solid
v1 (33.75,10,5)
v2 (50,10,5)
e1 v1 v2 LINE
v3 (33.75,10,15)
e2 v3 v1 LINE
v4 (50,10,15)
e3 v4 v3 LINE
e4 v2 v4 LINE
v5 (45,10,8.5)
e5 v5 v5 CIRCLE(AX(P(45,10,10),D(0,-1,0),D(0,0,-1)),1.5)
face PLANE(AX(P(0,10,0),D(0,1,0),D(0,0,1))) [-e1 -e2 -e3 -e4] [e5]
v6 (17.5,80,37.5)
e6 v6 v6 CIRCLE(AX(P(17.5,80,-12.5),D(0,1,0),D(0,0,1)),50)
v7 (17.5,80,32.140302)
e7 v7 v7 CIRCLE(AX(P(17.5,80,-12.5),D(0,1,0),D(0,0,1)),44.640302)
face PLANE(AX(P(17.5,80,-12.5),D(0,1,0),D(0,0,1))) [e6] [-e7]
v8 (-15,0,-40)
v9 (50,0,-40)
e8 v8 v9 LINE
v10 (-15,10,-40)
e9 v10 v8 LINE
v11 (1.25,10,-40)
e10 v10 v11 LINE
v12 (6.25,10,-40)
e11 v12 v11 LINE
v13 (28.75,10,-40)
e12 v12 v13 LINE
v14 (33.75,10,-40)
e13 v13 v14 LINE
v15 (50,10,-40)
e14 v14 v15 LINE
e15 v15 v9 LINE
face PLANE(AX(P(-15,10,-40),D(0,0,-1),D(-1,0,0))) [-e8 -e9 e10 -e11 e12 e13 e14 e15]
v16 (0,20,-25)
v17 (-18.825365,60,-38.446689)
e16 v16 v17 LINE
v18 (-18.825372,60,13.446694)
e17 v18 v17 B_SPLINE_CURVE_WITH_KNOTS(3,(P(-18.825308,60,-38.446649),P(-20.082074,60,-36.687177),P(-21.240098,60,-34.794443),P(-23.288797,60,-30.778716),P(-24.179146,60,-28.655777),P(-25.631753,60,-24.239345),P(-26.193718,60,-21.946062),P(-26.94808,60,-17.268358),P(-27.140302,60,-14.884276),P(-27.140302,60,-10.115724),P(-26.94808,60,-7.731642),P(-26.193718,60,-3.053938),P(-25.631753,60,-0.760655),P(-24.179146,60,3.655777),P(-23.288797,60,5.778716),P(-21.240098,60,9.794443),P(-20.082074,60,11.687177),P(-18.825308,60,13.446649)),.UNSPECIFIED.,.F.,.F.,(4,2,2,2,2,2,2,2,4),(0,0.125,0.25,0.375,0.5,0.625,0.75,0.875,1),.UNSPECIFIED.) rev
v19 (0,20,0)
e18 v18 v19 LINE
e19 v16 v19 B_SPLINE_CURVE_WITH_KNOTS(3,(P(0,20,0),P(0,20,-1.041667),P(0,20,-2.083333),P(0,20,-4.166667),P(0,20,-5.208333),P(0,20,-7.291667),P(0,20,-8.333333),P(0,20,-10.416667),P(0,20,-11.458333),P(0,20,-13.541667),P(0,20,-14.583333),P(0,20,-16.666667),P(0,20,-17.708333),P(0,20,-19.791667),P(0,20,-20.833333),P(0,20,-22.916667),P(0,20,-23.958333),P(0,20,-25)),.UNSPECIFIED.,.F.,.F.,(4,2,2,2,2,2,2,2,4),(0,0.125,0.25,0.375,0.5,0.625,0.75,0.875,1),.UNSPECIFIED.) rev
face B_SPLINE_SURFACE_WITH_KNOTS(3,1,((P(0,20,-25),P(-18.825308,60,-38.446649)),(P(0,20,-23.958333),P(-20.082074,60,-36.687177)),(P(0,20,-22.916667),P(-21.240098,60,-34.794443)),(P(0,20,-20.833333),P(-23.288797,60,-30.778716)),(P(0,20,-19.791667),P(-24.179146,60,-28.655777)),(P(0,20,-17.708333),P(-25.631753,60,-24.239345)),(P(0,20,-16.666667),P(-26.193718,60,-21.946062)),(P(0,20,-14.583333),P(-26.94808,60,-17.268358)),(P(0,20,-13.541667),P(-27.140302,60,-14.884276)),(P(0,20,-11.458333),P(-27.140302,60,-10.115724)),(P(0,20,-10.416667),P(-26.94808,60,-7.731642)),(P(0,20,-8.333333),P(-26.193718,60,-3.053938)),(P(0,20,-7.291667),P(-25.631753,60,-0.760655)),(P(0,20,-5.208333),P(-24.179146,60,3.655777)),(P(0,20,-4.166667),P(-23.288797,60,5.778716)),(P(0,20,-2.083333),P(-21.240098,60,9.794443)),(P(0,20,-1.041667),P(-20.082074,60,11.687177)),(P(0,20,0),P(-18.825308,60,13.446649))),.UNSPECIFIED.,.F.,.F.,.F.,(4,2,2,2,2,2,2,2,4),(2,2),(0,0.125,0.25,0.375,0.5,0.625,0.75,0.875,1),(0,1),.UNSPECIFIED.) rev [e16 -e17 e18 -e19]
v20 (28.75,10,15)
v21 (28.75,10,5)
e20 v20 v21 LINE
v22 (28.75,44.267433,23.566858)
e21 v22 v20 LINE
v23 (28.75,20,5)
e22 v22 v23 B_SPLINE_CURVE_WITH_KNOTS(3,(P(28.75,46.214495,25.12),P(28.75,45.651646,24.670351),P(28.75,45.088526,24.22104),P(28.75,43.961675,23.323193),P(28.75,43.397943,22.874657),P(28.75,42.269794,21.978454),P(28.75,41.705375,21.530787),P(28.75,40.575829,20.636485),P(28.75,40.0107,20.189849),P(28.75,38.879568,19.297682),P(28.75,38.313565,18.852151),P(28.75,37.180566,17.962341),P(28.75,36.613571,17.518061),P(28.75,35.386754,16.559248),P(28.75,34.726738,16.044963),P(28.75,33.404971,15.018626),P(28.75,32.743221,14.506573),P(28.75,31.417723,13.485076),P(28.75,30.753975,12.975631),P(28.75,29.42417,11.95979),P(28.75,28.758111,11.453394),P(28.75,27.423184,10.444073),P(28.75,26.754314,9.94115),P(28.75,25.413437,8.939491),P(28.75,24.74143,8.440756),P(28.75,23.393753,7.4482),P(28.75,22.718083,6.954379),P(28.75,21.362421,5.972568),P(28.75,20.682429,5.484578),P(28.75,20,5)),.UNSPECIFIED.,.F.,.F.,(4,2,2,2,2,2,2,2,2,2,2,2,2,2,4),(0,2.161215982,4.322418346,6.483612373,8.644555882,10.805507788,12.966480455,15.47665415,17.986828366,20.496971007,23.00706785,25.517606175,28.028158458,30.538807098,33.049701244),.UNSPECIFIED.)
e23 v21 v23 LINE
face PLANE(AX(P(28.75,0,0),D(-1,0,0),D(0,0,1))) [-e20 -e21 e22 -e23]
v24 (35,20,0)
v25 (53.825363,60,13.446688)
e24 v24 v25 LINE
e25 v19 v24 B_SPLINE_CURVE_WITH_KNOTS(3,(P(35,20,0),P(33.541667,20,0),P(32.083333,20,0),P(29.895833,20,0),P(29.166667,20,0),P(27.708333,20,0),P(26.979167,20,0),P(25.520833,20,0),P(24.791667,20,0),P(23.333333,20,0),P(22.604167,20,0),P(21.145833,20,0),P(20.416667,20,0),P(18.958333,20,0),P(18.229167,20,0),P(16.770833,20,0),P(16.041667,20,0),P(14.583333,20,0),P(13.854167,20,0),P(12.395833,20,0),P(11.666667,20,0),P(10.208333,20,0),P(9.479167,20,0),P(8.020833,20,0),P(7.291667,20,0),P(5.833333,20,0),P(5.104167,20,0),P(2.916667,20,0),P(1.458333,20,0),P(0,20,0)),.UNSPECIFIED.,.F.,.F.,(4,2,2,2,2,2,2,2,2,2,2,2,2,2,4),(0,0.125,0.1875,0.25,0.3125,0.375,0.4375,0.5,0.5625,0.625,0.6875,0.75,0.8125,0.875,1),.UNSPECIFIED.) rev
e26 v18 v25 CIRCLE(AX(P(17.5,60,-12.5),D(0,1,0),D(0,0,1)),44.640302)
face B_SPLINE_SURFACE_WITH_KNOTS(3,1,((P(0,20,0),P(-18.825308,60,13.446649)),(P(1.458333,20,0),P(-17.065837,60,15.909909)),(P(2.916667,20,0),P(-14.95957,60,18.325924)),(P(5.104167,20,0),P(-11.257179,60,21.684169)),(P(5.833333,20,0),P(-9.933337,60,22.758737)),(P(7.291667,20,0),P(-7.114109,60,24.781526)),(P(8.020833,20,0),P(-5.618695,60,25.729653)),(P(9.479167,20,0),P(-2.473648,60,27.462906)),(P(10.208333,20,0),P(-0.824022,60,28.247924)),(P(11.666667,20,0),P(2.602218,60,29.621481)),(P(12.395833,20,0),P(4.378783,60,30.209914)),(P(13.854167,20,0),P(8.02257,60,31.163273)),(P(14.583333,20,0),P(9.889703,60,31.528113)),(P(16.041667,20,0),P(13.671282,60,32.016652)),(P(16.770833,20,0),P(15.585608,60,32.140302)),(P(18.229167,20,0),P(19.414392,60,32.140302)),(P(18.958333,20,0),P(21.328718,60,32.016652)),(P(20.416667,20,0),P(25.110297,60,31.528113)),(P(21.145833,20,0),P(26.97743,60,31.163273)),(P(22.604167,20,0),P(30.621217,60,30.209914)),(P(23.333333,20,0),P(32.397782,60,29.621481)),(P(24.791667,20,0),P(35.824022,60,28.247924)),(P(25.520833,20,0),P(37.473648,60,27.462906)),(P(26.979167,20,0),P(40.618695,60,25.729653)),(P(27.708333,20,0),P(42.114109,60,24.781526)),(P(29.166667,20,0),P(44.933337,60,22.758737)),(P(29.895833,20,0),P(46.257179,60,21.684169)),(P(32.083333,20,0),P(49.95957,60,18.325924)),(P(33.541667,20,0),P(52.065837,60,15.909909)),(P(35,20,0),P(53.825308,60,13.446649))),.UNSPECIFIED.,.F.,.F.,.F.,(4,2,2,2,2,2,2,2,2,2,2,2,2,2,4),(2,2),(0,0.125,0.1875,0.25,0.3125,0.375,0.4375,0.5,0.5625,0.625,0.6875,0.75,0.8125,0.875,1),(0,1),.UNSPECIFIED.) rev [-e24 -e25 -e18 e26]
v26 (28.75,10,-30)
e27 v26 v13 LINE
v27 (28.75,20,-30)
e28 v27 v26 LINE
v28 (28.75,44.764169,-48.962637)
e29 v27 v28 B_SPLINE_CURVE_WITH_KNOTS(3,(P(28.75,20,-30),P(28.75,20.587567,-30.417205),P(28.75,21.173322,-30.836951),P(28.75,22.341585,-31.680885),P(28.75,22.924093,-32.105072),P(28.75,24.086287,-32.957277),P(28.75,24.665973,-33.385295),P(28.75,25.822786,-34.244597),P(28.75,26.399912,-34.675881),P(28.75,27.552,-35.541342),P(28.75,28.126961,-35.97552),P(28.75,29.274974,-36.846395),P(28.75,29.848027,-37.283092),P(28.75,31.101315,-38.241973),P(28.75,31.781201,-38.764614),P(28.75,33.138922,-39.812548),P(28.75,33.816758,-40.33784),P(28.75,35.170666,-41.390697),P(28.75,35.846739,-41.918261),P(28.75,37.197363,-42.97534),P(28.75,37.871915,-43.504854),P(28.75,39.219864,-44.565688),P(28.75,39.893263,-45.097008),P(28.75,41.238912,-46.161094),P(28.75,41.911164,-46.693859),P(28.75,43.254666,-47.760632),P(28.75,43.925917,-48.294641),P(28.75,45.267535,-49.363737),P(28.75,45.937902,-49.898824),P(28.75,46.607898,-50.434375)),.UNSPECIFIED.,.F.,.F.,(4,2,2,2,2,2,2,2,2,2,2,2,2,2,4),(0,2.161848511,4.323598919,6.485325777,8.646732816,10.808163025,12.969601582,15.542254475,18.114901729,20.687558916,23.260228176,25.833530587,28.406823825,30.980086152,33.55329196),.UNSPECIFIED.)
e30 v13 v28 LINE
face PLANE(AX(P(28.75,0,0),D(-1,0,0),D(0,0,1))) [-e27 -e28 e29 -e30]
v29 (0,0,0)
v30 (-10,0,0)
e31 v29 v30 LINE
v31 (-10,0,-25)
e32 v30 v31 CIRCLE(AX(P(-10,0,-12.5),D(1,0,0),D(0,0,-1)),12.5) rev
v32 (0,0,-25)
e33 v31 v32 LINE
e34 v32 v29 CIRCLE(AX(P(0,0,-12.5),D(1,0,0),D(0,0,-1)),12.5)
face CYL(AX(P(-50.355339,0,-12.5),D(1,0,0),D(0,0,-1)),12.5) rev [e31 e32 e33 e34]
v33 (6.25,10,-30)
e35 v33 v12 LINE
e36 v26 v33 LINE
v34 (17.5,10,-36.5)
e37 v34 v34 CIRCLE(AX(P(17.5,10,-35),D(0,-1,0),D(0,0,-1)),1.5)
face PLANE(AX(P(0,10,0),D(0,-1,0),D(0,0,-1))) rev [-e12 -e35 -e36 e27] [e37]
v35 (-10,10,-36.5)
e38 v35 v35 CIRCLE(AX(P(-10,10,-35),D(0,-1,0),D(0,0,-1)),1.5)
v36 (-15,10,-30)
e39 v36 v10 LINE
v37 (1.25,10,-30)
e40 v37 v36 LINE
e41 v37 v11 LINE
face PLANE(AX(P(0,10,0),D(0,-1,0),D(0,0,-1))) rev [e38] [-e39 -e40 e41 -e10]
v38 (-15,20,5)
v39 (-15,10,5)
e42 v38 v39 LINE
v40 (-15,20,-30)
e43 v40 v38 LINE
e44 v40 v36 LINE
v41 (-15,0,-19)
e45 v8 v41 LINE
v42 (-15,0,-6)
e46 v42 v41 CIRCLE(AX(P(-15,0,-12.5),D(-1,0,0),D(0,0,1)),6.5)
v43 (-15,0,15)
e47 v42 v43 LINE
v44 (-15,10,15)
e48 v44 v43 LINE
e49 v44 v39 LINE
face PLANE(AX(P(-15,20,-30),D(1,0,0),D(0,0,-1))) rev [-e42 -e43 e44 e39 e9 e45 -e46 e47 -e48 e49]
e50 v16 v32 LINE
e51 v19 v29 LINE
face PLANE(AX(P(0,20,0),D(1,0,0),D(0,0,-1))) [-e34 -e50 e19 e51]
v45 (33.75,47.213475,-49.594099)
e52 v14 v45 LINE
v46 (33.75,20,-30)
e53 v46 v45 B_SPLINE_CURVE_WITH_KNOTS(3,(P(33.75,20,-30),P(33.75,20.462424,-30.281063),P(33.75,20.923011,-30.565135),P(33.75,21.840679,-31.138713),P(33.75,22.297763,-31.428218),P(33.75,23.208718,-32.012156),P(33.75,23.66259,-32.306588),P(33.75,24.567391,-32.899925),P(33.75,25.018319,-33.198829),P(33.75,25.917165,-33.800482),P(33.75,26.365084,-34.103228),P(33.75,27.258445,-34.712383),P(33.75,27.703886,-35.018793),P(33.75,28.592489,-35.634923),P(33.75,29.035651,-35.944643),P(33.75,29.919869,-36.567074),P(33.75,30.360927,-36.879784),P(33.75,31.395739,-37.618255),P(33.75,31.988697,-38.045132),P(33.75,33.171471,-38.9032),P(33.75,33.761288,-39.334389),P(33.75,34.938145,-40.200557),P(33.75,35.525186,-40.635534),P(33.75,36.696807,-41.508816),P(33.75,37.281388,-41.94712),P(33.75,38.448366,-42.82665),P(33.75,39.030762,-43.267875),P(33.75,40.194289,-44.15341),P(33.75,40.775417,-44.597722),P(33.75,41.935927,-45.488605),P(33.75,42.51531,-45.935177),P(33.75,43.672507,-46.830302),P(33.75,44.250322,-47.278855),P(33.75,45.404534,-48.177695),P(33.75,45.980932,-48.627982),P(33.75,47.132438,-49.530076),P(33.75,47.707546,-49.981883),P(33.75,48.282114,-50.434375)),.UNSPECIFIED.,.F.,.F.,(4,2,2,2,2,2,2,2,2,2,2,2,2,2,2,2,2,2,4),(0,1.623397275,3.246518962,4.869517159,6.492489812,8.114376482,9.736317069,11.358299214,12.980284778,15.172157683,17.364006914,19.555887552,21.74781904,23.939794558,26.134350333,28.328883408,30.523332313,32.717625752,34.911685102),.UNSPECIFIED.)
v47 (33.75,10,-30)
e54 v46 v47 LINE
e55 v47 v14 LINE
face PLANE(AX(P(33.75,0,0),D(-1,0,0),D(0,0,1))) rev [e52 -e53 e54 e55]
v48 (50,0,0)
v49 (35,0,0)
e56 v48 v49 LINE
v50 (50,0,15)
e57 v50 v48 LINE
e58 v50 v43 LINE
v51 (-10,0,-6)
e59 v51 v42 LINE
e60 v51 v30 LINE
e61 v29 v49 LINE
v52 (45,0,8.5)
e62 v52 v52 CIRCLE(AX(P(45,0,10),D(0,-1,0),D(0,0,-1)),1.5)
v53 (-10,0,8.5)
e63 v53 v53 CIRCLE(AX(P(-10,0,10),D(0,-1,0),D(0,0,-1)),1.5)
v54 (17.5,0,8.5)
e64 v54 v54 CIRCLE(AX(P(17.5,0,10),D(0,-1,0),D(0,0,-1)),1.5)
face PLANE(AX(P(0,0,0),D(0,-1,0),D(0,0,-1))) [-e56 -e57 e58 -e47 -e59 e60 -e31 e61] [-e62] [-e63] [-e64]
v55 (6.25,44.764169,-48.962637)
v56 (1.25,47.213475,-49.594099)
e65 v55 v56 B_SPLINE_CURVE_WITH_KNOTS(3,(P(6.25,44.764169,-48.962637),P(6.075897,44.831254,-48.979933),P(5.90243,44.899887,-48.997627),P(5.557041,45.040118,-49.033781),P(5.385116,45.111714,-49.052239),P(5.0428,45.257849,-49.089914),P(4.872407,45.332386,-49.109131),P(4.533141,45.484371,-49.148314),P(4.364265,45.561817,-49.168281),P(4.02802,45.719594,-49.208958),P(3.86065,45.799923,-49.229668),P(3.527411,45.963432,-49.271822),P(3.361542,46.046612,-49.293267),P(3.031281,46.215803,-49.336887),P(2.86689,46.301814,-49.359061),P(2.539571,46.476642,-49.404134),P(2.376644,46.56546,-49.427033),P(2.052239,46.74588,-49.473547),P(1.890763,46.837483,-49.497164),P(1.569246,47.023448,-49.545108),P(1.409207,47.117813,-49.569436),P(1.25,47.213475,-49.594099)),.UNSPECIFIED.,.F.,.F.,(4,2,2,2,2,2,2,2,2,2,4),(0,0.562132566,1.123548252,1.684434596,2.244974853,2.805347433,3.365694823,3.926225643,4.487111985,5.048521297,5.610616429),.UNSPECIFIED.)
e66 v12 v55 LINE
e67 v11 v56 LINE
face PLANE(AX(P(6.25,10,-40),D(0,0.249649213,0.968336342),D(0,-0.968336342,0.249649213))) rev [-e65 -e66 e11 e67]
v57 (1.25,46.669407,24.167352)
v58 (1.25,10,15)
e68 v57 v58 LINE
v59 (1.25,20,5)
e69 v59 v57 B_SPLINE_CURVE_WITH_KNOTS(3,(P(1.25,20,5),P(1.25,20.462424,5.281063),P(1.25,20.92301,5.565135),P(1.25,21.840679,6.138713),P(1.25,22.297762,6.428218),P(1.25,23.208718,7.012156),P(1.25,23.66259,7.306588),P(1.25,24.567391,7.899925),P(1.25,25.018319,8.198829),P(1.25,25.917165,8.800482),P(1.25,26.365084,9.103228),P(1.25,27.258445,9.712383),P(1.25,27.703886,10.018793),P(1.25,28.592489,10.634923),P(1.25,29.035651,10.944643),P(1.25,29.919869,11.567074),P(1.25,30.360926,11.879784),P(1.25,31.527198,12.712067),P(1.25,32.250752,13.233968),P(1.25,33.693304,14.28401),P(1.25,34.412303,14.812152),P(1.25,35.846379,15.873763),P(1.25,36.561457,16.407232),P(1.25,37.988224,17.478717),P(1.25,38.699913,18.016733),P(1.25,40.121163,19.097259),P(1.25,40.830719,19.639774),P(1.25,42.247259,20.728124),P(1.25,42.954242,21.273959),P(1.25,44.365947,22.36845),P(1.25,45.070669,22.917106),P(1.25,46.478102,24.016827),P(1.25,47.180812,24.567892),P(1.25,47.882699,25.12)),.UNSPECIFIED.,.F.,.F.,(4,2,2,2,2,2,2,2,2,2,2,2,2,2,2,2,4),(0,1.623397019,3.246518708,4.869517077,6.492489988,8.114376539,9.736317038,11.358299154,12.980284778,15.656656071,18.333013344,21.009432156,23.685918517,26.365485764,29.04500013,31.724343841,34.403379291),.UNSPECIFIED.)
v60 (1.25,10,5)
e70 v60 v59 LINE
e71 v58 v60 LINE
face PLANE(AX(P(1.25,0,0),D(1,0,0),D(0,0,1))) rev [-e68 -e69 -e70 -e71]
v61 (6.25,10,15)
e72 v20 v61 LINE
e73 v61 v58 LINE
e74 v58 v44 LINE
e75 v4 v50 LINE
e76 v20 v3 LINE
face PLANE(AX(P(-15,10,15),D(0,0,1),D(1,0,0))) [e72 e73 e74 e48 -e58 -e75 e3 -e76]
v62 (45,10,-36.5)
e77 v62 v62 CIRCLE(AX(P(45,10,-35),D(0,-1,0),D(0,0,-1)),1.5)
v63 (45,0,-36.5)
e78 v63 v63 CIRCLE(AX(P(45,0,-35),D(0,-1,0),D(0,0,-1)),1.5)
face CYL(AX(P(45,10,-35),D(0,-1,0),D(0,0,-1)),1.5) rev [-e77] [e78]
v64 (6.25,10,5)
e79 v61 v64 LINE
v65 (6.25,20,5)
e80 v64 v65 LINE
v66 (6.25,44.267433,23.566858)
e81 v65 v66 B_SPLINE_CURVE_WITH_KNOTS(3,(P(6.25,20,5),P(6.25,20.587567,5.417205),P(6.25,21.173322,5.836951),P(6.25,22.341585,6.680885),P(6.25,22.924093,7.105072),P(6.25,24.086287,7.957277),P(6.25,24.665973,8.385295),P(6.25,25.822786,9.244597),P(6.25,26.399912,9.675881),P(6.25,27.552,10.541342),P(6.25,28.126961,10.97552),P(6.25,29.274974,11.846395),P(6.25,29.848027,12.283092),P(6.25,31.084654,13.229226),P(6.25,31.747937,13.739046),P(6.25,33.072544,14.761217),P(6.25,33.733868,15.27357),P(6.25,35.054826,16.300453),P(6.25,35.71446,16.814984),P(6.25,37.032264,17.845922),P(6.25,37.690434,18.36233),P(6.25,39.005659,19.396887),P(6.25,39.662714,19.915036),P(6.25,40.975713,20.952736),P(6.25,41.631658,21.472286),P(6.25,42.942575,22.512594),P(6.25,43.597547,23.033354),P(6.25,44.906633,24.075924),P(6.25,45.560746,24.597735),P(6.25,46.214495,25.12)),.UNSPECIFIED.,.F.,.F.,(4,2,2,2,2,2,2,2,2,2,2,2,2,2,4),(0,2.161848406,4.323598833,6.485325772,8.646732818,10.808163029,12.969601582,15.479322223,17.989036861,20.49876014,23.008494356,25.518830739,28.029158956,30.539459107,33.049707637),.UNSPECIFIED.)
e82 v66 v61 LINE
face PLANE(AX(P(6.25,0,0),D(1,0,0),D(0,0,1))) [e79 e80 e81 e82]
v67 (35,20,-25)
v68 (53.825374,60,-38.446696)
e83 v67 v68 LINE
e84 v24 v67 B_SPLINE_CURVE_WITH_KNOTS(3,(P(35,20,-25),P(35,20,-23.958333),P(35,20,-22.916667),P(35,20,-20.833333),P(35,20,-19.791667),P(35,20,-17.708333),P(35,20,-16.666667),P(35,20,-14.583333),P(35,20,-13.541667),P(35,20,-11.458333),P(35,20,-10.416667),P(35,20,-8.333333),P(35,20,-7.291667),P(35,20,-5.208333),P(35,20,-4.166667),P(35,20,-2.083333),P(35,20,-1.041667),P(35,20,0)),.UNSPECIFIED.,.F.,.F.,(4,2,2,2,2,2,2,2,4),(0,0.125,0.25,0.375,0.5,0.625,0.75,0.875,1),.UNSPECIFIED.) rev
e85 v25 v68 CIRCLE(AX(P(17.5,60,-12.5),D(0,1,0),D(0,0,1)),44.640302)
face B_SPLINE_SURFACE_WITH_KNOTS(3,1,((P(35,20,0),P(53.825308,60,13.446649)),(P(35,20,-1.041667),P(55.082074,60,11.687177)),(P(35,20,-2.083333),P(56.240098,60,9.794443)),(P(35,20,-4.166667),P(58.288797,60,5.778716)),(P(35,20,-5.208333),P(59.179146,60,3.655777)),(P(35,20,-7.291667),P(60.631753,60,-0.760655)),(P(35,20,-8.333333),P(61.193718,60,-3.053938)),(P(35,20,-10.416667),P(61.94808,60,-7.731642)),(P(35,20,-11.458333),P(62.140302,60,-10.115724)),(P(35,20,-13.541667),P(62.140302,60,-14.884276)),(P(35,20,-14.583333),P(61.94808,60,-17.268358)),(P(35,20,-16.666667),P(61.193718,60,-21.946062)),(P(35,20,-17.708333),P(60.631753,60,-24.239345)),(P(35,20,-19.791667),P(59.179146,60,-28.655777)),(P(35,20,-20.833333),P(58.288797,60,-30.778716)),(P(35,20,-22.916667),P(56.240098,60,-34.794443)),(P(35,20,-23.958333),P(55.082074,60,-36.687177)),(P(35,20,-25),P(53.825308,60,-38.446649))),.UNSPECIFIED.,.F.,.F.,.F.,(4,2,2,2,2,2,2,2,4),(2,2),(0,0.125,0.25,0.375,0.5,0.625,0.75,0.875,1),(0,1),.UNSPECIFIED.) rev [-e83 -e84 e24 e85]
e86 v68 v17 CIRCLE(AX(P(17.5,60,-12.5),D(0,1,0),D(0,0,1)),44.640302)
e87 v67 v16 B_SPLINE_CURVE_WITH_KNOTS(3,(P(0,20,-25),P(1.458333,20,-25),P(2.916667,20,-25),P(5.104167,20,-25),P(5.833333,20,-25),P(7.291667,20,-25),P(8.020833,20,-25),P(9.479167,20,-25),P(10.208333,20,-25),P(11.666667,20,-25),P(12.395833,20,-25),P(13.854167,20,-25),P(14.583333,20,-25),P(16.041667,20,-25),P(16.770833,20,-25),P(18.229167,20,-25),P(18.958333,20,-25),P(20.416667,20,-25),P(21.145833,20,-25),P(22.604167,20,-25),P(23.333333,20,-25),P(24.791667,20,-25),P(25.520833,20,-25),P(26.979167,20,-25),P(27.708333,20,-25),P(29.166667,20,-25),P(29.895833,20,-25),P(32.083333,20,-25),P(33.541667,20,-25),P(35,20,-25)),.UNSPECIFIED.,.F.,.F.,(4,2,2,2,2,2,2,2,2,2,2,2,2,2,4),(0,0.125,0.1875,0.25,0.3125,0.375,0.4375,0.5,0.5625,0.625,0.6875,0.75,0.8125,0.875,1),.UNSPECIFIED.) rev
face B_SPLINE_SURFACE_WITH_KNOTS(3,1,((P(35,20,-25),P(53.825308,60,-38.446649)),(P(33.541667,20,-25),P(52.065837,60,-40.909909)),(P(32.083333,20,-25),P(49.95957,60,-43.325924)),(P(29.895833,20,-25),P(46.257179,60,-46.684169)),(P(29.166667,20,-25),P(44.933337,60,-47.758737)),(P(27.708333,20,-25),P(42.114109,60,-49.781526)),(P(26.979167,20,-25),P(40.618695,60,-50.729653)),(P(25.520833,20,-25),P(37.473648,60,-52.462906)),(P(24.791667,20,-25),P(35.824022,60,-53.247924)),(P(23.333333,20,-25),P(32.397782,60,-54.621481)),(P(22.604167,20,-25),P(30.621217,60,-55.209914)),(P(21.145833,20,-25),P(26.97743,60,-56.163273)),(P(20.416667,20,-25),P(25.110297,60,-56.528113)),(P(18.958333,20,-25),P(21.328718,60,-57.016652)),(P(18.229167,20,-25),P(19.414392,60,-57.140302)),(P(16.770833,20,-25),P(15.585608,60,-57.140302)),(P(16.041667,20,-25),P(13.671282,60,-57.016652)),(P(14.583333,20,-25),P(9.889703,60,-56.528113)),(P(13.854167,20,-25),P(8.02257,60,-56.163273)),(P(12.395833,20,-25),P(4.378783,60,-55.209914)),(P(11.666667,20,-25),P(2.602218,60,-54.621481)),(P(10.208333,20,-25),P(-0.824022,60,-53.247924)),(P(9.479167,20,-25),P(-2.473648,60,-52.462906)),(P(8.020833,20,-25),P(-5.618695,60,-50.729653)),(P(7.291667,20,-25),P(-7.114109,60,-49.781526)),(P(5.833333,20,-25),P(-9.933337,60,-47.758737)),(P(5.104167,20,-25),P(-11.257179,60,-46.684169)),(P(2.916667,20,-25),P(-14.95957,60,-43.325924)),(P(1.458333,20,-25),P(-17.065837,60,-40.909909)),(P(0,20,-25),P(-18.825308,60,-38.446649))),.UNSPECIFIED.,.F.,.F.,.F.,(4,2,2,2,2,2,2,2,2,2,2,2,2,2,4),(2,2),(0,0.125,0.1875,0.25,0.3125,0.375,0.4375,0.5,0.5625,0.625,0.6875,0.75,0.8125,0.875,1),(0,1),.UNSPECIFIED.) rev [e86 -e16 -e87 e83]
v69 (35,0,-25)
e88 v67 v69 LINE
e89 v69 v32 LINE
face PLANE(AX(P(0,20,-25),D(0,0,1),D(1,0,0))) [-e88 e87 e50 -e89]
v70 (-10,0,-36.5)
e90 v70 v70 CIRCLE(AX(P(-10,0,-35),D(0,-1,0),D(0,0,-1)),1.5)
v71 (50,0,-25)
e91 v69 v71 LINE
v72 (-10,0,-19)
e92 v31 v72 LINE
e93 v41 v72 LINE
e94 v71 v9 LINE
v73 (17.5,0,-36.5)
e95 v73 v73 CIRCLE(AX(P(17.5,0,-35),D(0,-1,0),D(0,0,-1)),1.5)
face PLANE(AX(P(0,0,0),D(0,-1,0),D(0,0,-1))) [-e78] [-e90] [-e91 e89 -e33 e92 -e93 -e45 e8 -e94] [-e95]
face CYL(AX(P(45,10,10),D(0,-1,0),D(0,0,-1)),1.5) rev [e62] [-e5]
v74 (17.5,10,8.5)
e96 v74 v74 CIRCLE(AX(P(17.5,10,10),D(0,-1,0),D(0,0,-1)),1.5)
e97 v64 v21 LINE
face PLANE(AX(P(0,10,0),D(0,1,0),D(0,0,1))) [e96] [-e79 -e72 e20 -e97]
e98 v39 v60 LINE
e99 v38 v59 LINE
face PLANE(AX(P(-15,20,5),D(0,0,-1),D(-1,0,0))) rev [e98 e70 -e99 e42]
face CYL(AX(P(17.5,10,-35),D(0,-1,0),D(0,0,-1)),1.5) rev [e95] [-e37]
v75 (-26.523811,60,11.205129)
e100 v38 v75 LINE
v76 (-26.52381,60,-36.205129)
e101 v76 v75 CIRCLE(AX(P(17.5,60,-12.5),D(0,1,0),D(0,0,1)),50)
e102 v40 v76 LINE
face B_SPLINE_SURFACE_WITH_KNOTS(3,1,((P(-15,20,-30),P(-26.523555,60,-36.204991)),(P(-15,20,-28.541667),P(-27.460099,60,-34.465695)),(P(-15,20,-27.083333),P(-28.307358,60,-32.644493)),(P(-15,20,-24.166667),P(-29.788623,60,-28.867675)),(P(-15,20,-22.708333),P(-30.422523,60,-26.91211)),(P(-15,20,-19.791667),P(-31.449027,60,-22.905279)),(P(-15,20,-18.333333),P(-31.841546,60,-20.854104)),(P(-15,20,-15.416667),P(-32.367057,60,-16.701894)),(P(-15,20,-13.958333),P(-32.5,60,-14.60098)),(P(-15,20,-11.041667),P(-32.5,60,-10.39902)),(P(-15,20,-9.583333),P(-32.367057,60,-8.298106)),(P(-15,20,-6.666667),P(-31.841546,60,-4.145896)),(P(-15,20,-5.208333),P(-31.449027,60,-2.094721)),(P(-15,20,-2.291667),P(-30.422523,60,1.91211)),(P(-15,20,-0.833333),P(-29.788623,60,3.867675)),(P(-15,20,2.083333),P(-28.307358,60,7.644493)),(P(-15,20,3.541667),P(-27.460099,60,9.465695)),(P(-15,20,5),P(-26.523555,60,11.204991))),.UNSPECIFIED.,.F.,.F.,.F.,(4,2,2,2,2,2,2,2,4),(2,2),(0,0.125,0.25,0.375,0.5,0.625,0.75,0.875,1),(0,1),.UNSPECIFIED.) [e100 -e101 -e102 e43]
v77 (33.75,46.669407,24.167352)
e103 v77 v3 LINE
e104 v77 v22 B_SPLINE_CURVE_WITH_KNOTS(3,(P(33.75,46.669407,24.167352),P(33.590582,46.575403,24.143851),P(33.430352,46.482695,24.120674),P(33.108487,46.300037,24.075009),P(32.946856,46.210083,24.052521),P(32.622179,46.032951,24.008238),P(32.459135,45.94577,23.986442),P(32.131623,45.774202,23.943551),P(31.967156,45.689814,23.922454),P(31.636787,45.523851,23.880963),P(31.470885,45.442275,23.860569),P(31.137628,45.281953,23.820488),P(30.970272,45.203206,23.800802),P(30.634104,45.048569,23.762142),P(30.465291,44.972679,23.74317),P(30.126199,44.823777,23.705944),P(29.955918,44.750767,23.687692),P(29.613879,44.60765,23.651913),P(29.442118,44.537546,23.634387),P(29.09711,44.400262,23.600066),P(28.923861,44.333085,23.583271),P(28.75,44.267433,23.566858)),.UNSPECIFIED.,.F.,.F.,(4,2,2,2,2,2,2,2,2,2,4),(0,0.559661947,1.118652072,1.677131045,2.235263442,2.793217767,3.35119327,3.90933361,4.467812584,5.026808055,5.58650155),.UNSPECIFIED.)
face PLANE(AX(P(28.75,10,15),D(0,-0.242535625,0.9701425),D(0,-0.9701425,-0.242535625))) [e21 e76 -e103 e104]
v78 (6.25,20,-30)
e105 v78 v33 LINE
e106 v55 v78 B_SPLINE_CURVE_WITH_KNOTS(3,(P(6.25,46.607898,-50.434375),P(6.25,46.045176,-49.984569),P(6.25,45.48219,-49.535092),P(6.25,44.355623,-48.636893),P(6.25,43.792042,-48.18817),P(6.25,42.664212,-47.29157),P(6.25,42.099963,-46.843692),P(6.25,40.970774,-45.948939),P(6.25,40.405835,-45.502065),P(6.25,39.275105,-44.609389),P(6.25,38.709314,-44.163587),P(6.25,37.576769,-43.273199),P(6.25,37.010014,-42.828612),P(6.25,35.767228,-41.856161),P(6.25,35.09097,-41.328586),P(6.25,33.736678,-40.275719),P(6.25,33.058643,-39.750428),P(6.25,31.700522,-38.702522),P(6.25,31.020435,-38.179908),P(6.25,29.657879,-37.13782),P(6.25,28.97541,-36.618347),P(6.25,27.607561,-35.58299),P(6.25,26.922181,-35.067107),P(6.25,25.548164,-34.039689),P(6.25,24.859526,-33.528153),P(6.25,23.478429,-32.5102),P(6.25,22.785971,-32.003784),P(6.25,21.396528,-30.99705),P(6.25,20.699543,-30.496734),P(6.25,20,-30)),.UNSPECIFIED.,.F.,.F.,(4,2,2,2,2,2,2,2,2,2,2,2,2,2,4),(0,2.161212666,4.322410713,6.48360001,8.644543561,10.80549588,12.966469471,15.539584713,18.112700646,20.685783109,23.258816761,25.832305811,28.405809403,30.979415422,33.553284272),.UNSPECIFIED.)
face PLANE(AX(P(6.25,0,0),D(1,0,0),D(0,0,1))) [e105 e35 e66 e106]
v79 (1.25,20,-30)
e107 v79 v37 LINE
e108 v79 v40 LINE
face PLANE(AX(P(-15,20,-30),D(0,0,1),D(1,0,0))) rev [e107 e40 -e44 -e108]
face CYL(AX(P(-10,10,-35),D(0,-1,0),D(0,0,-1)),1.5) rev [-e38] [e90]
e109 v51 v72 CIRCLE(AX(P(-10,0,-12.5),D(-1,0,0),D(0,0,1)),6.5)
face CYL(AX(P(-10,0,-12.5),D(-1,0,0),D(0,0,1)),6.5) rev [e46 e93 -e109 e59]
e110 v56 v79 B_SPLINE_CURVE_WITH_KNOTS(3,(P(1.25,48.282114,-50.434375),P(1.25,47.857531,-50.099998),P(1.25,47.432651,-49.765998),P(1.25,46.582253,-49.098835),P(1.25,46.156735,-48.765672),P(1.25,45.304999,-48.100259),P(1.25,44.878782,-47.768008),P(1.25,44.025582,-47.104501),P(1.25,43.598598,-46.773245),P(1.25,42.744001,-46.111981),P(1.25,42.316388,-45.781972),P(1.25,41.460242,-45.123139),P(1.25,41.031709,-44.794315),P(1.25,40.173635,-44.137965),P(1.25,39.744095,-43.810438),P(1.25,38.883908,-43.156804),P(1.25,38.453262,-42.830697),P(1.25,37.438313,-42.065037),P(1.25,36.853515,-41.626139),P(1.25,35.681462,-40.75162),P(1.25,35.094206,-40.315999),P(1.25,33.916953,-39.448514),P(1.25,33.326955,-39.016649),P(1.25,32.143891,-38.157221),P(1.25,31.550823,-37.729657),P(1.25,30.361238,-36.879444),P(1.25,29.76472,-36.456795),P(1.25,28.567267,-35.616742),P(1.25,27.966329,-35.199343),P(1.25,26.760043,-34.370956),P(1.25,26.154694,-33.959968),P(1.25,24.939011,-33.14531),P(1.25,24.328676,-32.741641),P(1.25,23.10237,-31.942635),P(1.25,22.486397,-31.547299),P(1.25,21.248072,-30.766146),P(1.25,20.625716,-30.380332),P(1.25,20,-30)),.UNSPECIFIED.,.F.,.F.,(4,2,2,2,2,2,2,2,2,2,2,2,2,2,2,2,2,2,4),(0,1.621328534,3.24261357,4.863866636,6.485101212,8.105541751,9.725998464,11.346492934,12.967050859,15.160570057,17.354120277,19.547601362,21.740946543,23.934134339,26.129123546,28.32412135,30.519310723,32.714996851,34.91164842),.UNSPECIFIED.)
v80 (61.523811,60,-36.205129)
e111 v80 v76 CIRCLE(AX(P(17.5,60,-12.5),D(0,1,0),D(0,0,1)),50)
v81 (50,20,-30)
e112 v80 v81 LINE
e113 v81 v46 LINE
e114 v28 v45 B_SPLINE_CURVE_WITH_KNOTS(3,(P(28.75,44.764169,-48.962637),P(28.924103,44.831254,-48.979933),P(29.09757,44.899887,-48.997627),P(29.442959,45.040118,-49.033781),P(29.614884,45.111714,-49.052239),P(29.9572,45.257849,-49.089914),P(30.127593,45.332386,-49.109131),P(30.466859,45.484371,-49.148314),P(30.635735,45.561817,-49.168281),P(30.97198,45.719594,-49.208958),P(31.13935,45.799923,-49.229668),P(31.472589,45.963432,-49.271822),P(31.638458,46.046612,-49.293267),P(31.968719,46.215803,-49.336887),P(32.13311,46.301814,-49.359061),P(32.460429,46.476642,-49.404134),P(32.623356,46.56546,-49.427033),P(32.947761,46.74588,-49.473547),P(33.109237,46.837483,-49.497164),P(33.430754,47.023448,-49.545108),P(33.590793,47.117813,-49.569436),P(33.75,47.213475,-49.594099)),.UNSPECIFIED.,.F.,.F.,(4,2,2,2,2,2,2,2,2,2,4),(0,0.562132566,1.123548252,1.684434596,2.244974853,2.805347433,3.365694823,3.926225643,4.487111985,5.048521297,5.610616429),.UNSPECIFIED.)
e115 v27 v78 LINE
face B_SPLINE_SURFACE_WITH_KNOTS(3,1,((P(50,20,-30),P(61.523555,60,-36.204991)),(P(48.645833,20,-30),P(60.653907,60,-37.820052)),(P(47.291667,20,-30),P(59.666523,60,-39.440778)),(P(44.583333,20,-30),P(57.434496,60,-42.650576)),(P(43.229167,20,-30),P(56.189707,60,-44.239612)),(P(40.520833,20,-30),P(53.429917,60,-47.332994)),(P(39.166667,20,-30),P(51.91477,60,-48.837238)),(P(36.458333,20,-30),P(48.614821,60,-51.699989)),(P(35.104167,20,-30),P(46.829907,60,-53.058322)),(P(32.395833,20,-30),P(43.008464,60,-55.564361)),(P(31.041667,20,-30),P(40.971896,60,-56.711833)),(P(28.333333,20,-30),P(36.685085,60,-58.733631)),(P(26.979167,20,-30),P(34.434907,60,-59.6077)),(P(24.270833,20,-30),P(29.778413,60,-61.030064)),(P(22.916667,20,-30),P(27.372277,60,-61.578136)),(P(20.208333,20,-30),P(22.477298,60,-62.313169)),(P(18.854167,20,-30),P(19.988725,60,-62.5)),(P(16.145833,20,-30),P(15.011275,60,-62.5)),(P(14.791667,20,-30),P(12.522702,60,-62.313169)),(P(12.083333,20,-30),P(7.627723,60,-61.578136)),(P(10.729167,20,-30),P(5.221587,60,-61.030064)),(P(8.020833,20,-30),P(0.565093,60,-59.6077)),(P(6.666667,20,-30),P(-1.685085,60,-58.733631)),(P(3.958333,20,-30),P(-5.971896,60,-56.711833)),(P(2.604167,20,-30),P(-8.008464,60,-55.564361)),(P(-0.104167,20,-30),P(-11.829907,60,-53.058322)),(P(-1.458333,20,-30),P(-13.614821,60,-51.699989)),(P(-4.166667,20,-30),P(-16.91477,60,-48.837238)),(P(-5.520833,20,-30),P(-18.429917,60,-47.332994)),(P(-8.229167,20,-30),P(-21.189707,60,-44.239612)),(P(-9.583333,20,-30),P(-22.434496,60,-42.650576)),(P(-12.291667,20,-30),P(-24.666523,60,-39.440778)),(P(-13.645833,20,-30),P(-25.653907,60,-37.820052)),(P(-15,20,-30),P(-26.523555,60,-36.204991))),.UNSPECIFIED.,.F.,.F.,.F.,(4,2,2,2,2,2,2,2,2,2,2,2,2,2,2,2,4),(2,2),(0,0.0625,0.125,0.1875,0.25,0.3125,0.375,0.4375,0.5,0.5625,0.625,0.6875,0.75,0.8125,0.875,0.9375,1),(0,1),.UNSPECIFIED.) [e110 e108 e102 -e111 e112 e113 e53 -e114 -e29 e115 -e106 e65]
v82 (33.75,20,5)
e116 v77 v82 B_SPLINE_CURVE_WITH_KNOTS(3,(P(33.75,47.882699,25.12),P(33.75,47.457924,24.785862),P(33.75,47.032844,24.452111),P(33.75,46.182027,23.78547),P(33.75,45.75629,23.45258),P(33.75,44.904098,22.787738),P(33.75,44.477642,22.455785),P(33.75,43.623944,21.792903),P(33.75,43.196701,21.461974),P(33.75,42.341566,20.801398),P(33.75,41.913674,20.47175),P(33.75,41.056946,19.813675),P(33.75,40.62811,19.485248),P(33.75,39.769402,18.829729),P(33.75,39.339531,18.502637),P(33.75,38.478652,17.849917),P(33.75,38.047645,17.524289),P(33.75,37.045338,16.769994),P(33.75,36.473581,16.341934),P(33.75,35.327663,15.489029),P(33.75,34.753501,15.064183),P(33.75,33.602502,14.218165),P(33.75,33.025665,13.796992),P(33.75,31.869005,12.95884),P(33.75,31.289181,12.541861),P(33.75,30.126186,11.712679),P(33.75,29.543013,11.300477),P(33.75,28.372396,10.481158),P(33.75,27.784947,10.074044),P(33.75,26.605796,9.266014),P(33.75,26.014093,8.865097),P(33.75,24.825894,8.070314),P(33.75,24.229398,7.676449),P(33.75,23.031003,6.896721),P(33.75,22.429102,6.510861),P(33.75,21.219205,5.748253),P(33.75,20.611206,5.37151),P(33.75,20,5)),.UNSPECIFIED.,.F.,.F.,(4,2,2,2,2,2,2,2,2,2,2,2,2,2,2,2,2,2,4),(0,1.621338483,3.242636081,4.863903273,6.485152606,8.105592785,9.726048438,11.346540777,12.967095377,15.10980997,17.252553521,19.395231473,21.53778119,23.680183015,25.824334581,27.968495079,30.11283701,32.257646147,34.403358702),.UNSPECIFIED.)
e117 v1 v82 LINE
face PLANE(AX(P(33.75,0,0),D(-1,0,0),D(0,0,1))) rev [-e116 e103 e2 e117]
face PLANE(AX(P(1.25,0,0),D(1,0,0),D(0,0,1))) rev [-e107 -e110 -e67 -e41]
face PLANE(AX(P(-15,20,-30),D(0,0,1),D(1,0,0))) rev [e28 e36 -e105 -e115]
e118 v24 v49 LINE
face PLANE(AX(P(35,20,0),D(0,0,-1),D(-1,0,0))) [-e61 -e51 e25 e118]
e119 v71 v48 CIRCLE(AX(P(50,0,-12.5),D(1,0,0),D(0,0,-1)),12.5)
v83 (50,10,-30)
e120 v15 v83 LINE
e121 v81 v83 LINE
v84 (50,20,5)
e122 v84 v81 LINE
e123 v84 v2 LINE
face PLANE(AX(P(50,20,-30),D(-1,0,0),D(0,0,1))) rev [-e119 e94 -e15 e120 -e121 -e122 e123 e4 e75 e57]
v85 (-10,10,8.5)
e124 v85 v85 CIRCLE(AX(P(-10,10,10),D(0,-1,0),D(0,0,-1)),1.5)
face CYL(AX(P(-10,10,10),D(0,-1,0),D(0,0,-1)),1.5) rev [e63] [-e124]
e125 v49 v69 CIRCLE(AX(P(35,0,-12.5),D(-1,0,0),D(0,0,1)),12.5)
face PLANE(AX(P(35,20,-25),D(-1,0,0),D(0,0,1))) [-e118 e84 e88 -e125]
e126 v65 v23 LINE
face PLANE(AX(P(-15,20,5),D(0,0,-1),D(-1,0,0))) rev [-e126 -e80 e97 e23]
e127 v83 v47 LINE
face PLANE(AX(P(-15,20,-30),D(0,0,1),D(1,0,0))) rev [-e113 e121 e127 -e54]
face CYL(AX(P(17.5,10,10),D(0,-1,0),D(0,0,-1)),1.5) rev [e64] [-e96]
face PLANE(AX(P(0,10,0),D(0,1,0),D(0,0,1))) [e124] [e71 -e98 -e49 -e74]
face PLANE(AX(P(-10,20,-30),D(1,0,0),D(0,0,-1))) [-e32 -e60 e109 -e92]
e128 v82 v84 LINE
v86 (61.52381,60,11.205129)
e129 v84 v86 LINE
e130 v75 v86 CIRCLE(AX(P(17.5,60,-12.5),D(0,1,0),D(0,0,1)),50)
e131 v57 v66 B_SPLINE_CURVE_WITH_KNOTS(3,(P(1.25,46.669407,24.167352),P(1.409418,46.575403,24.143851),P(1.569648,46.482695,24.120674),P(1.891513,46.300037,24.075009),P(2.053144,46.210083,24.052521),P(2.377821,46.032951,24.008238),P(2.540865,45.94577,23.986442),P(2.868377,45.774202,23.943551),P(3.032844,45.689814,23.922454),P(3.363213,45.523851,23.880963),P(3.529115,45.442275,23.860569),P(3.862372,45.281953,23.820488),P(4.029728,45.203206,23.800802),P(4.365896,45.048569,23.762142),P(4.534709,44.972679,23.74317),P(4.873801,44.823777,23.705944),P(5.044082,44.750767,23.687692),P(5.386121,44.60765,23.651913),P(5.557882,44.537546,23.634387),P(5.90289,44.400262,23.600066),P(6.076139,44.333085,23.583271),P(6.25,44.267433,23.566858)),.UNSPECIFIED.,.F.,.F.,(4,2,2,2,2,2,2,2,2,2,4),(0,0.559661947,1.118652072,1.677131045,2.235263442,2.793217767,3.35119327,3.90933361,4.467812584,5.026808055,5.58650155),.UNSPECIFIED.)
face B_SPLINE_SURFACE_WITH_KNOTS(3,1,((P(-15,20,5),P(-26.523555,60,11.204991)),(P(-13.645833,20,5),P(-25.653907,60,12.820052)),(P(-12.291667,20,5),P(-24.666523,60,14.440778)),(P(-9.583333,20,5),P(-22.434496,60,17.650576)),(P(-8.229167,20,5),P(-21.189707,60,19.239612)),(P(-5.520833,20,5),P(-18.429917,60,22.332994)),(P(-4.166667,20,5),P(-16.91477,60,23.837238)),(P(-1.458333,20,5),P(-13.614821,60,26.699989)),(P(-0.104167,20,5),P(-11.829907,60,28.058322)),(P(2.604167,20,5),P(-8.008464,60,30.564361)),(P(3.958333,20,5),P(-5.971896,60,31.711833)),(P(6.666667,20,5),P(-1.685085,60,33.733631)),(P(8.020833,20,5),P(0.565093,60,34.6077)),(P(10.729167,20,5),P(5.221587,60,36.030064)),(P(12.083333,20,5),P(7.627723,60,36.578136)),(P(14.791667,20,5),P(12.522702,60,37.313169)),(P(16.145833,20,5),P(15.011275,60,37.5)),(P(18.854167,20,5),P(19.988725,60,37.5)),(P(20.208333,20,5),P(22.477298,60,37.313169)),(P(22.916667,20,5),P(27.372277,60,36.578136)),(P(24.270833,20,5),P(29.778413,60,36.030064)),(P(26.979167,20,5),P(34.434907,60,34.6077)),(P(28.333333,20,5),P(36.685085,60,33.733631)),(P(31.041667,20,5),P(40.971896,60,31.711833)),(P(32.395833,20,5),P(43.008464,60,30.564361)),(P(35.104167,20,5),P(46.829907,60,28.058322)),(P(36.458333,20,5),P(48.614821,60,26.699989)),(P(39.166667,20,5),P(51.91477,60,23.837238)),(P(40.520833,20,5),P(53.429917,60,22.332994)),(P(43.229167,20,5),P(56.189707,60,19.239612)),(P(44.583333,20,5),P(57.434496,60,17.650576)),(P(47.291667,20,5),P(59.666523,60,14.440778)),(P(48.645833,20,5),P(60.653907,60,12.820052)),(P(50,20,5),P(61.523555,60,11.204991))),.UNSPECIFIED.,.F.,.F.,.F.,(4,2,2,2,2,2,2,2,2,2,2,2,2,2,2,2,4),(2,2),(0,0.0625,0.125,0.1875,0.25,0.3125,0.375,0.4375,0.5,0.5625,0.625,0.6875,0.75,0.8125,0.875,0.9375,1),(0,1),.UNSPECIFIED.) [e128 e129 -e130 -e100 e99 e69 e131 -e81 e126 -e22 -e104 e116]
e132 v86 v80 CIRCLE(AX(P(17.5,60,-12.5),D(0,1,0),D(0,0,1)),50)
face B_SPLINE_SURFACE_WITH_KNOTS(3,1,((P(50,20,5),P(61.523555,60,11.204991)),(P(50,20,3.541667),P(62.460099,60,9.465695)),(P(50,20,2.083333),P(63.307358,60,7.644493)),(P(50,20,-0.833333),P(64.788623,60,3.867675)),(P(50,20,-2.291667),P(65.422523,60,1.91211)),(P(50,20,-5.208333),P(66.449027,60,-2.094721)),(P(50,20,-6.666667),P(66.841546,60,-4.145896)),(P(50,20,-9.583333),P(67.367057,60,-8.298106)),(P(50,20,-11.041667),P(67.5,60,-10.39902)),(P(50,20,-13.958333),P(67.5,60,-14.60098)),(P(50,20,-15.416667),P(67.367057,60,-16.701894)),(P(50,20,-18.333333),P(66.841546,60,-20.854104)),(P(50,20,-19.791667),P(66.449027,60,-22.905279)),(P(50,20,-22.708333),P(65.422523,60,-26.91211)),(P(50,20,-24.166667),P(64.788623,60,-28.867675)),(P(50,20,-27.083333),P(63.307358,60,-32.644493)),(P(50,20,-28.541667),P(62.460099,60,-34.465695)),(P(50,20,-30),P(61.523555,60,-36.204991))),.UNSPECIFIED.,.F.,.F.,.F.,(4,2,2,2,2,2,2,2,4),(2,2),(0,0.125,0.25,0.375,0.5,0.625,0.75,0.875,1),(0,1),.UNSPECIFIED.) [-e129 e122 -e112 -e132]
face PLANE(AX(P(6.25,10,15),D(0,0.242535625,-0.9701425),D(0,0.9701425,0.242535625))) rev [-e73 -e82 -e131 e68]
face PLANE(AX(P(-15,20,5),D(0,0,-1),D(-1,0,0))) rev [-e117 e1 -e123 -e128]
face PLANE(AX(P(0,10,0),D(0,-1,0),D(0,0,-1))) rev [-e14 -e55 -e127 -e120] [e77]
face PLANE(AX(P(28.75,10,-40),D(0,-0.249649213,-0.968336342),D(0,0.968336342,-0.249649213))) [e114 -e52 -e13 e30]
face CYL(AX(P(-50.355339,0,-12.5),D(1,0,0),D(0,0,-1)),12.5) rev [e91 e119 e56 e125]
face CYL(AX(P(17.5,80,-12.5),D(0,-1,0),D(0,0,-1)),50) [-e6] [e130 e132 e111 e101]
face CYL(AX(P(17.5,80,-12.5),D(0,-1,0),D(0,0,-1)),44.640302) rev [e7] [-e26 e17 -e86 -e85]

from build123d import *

# Parameters (mm, degrees)
CROQUIS2_W              = 65
CROQUIS2_H              = 35
CROQUIS2_W_2            = 35
CROQUIS2_H_2            = 25
SALIENTE_EXTRUIR1_DEPTH = 20
CROQUIS3_R              = 12.5
CORTAR_EXTRUIR1_DEPTH   = 60
CROQUIS4_R              = 6.5
CORTAR_EXTRUIR2_DEPTH   = 5
CROQUIS10_R             = 50
CROQUIS10_R_2           = 44.640302452
SALIENTE_EXTRUIR2_DEPTH = 20
CROQUIS11_W             = 65
CROQUIS11_H             = 10
CROQUIS11_R             = 1.5
SALIENTE_EXTRUIR3_DEPTH = 10
SALIENTE_EXTRUIR4_DEPTH = 2.5


with BuildPart() as part:
    # Croquis2 → Saliente-Extruir1 (new body)
    with BuildSketch(Plane(origin=(0, 0, 0), x_dir=(1, 0, 0), z_dir=(0, 1, 0))):
        with Locations((17.5, 12.5)):
            Rectangle(CROQUIS2_W, CROQUIS2_H)
        with Locations((17.5, 12.5)):
            Rectangle(CROQUIS2_W_2, CROQUIS2_H_2, mode=Mode.SUBTRACT)
    extrude(amount=SALIENTE_EXTRUIR1_DEPTH)

    # Croquis3 → Cortar-Extruir1 (cut)
    with BuildSketch(Plane(origin=(50, 0, 0), x_dir=(0, 0, -1), z_dir=(1, 0, 0))):
        with Locations((12.5, 0)):
            Circle(CROQUIS3_R)
    extrude(amount=-CORTAR_EXTRUIR1_DEPTH, mode=Mode.SUBTRACT)

    # Croquis4 → Cortar-Extruir2 (cut)
    with BuildSketch(Plane.ZY.offset(15)):
        with Locations((-12.5, 0)):
            Circle(CROQUIS4_R)
    extrude(amount=-CORTAR_EXTRUIR2_DEPTH, mode=Mode.SUBTRACT)

    # Croquis5 → Recubrir2 section 0
    with BuildSketch(Plane(origin=(0, 20, 0), x_dir=(1, 0, 0), z_dir=(0, 1, 0))):
        with BuildLine():
            Line((-15, -5), (50, -5))
            Line((50, -5), (50, 30))
            Line((50, 30), (-15, 30))
            Line((-15, 30), (-15, -5))
        make_face()
    # Croquis6 for Recubrir2 → Recubrir2 section 1
    with BuildSketch(Plane(origin=(0, 60, 0), x_dir=(1, 0, 0), z_dir=(0, 1, 0))):
        with BuildLine():
            # circular arc as an exact rational Bezier (weights 1, cos(half-angle), 1)
            Bezier((-26.523554996, -11.204991152), (17.5, -92.963021858), (61.523554996, -11.204991152), weights=[1, 0.474099823, 1])
            Bezier((61.523554996, -11.204991152), (74.287781001, 12.5), (61.523554996, 36.204991152), weights=[1, 0.8804711, 1])
            Bezier((61.523554996, 36.204991152), (17.5, 117.963021858), (-26.523554996, 36.204991152), weights=[1, 0.474099823, 1])
            Bezier((-26.523554996, 36.204991152), (-39.287781001, 12.5), (-26.523554996, -11.204991152), weights=[1, 0.8804711, 1])
        make_face()
    loft()

    # Croquis10 → Saliente-Extruir2 (add)
    with BuildSketch(Plane(origin=(0, 60, 0), x_dir=(1, 0, 0), z_dir=(0, 1, 0))):
        with Locations(Location((17.5, 12.5, 0), (0, 0, 151.699244219))):
            Circle(CROQUIS10_R)
        with Locations(Location((17.5, 12.5, 0), (0, 0, 270))):
            Circle(CROQUIS10_R_2, mode=Mode.SUBTRACT)
    extrude(amount=SALIENTE_EXTRUIR2_DEPTH)

    # Croquis11 → Saliente-Extruir3 (add)
    # profile 1 of 2: a face of its own
    with BuildSketch(Plane.XZ):
        with Locations((17.5, 10)):
            Rectangle(CROQUIS11_W, CROQUIS11_H)
        with Locations(Location((45, 10, 0), (0, 0, 270))):
            Circle(CROQUIS11_R, mode=Mode.SUBTRACT)
        with Locations(Location((-10, 10, 0), (0, 0, 270))):
            Circle(CROQUIS11_R, mode=Mode.SUBTRACT)
        with Locations(Location((17.5, 10, 0), (0, 0, 270))):
            Circle(CROQUIS11_R, mode=Mode.SUBTRACT)
    # profile 2 of 2: a face of its own
    with BuildSketch(Plane.XZ):
        with Locations((17.5, -35)):
            Rectangle(CROQUIS11_W, CROQUIS11_H)
        with Locations(Location((45, -35, 0), (0, 0, 270))):
            Circle(CROQUIS11_R, mode=Mode.SUBTRACT)
        with Locations(Location((-10, -35, 0), (0, 0, 270))):
            Circle(CROQUIS11_R, mode=Mode.SUBTRACT)
        with Locations(Location((17.5, -35, 0), (0, 0, 270))):
            Circle(CROQUIS11_R, mode=Mode.SUBTRACT)
    extrude(amount=-SALIENTE_EXTRUIR3_DEPTH)

    # Croquis12 → Saliente-Extruir4 (add, symmetric)
    with BuildSketch(Plane(origin=(31.25, 0, 0), x_dir=(0, 0, -1), z_dir=(1, 0, 0))):
        Polygon((-5, 10), (-5, 50), (-25, 50), (-15, 10), align=None)
        Polygon((30, 10), (40, 10), (50.3125, 50), (30, 50), align=None)
    saliente_extruir4 = extrude(amount=SALIENTE_EXTRUIR4_DEPTH, both=True)

    # Simetría1: Saliente-Extruir4 across plane
    add(saliente_extruir4.mirror(Plane(origin=(17.5, 0, 0), x_dir=(0, 0, 1), z_dir=(1, 0, 0))))

    # Croquis9 → Cortar-Recubrir2 section 0
    with BuildSketch(Plane(origin=(0, 20, 0), x_dir=(1, 0, 0), z_dir=(0, 1, 0))):
        with BuildLine():
            Line((0, 0), (35, 0))
            Line((35, 0), (35, 25))
            Line((35, 25), (0, 25))
            Line((0, 25), (0, 0))
        make_face()
    # Croquis8 for Cortar-Recub → Cortar-Recubrir2 section 1
    with BuildSketch(Plane(origin=(0, 60, 0), x_dir=(1, 0, 0), z_dir=(0, 1, 0))):
        with BuildLine():
            Bezier((-18.82530827, -13.446648764), (17.5, -64.302080343), (53.82530827, -13.446648764), weights=[1, 0.581238194, 1])
            Bezier((53.82530827, -13.446648764), (72.358628816, 12.5), (53.82530827, 38.446648764), weights=[1, 0.813733471, 1])
            Bezier((53.82530827, 38.446648764), (17.5, 89.302080343), (-18.82530827, 38.446648764), weights=[1, 0.581238194, 1])
            Bezier((-18.82530827, 38.446648764), (-37.358628816, 12.5), (-18.82530827, -13.446648764), weights=[1, 0.813733471, 1])
        make_face()
    loft(mode=Mode.SUBTRACT)


solid = part.part
